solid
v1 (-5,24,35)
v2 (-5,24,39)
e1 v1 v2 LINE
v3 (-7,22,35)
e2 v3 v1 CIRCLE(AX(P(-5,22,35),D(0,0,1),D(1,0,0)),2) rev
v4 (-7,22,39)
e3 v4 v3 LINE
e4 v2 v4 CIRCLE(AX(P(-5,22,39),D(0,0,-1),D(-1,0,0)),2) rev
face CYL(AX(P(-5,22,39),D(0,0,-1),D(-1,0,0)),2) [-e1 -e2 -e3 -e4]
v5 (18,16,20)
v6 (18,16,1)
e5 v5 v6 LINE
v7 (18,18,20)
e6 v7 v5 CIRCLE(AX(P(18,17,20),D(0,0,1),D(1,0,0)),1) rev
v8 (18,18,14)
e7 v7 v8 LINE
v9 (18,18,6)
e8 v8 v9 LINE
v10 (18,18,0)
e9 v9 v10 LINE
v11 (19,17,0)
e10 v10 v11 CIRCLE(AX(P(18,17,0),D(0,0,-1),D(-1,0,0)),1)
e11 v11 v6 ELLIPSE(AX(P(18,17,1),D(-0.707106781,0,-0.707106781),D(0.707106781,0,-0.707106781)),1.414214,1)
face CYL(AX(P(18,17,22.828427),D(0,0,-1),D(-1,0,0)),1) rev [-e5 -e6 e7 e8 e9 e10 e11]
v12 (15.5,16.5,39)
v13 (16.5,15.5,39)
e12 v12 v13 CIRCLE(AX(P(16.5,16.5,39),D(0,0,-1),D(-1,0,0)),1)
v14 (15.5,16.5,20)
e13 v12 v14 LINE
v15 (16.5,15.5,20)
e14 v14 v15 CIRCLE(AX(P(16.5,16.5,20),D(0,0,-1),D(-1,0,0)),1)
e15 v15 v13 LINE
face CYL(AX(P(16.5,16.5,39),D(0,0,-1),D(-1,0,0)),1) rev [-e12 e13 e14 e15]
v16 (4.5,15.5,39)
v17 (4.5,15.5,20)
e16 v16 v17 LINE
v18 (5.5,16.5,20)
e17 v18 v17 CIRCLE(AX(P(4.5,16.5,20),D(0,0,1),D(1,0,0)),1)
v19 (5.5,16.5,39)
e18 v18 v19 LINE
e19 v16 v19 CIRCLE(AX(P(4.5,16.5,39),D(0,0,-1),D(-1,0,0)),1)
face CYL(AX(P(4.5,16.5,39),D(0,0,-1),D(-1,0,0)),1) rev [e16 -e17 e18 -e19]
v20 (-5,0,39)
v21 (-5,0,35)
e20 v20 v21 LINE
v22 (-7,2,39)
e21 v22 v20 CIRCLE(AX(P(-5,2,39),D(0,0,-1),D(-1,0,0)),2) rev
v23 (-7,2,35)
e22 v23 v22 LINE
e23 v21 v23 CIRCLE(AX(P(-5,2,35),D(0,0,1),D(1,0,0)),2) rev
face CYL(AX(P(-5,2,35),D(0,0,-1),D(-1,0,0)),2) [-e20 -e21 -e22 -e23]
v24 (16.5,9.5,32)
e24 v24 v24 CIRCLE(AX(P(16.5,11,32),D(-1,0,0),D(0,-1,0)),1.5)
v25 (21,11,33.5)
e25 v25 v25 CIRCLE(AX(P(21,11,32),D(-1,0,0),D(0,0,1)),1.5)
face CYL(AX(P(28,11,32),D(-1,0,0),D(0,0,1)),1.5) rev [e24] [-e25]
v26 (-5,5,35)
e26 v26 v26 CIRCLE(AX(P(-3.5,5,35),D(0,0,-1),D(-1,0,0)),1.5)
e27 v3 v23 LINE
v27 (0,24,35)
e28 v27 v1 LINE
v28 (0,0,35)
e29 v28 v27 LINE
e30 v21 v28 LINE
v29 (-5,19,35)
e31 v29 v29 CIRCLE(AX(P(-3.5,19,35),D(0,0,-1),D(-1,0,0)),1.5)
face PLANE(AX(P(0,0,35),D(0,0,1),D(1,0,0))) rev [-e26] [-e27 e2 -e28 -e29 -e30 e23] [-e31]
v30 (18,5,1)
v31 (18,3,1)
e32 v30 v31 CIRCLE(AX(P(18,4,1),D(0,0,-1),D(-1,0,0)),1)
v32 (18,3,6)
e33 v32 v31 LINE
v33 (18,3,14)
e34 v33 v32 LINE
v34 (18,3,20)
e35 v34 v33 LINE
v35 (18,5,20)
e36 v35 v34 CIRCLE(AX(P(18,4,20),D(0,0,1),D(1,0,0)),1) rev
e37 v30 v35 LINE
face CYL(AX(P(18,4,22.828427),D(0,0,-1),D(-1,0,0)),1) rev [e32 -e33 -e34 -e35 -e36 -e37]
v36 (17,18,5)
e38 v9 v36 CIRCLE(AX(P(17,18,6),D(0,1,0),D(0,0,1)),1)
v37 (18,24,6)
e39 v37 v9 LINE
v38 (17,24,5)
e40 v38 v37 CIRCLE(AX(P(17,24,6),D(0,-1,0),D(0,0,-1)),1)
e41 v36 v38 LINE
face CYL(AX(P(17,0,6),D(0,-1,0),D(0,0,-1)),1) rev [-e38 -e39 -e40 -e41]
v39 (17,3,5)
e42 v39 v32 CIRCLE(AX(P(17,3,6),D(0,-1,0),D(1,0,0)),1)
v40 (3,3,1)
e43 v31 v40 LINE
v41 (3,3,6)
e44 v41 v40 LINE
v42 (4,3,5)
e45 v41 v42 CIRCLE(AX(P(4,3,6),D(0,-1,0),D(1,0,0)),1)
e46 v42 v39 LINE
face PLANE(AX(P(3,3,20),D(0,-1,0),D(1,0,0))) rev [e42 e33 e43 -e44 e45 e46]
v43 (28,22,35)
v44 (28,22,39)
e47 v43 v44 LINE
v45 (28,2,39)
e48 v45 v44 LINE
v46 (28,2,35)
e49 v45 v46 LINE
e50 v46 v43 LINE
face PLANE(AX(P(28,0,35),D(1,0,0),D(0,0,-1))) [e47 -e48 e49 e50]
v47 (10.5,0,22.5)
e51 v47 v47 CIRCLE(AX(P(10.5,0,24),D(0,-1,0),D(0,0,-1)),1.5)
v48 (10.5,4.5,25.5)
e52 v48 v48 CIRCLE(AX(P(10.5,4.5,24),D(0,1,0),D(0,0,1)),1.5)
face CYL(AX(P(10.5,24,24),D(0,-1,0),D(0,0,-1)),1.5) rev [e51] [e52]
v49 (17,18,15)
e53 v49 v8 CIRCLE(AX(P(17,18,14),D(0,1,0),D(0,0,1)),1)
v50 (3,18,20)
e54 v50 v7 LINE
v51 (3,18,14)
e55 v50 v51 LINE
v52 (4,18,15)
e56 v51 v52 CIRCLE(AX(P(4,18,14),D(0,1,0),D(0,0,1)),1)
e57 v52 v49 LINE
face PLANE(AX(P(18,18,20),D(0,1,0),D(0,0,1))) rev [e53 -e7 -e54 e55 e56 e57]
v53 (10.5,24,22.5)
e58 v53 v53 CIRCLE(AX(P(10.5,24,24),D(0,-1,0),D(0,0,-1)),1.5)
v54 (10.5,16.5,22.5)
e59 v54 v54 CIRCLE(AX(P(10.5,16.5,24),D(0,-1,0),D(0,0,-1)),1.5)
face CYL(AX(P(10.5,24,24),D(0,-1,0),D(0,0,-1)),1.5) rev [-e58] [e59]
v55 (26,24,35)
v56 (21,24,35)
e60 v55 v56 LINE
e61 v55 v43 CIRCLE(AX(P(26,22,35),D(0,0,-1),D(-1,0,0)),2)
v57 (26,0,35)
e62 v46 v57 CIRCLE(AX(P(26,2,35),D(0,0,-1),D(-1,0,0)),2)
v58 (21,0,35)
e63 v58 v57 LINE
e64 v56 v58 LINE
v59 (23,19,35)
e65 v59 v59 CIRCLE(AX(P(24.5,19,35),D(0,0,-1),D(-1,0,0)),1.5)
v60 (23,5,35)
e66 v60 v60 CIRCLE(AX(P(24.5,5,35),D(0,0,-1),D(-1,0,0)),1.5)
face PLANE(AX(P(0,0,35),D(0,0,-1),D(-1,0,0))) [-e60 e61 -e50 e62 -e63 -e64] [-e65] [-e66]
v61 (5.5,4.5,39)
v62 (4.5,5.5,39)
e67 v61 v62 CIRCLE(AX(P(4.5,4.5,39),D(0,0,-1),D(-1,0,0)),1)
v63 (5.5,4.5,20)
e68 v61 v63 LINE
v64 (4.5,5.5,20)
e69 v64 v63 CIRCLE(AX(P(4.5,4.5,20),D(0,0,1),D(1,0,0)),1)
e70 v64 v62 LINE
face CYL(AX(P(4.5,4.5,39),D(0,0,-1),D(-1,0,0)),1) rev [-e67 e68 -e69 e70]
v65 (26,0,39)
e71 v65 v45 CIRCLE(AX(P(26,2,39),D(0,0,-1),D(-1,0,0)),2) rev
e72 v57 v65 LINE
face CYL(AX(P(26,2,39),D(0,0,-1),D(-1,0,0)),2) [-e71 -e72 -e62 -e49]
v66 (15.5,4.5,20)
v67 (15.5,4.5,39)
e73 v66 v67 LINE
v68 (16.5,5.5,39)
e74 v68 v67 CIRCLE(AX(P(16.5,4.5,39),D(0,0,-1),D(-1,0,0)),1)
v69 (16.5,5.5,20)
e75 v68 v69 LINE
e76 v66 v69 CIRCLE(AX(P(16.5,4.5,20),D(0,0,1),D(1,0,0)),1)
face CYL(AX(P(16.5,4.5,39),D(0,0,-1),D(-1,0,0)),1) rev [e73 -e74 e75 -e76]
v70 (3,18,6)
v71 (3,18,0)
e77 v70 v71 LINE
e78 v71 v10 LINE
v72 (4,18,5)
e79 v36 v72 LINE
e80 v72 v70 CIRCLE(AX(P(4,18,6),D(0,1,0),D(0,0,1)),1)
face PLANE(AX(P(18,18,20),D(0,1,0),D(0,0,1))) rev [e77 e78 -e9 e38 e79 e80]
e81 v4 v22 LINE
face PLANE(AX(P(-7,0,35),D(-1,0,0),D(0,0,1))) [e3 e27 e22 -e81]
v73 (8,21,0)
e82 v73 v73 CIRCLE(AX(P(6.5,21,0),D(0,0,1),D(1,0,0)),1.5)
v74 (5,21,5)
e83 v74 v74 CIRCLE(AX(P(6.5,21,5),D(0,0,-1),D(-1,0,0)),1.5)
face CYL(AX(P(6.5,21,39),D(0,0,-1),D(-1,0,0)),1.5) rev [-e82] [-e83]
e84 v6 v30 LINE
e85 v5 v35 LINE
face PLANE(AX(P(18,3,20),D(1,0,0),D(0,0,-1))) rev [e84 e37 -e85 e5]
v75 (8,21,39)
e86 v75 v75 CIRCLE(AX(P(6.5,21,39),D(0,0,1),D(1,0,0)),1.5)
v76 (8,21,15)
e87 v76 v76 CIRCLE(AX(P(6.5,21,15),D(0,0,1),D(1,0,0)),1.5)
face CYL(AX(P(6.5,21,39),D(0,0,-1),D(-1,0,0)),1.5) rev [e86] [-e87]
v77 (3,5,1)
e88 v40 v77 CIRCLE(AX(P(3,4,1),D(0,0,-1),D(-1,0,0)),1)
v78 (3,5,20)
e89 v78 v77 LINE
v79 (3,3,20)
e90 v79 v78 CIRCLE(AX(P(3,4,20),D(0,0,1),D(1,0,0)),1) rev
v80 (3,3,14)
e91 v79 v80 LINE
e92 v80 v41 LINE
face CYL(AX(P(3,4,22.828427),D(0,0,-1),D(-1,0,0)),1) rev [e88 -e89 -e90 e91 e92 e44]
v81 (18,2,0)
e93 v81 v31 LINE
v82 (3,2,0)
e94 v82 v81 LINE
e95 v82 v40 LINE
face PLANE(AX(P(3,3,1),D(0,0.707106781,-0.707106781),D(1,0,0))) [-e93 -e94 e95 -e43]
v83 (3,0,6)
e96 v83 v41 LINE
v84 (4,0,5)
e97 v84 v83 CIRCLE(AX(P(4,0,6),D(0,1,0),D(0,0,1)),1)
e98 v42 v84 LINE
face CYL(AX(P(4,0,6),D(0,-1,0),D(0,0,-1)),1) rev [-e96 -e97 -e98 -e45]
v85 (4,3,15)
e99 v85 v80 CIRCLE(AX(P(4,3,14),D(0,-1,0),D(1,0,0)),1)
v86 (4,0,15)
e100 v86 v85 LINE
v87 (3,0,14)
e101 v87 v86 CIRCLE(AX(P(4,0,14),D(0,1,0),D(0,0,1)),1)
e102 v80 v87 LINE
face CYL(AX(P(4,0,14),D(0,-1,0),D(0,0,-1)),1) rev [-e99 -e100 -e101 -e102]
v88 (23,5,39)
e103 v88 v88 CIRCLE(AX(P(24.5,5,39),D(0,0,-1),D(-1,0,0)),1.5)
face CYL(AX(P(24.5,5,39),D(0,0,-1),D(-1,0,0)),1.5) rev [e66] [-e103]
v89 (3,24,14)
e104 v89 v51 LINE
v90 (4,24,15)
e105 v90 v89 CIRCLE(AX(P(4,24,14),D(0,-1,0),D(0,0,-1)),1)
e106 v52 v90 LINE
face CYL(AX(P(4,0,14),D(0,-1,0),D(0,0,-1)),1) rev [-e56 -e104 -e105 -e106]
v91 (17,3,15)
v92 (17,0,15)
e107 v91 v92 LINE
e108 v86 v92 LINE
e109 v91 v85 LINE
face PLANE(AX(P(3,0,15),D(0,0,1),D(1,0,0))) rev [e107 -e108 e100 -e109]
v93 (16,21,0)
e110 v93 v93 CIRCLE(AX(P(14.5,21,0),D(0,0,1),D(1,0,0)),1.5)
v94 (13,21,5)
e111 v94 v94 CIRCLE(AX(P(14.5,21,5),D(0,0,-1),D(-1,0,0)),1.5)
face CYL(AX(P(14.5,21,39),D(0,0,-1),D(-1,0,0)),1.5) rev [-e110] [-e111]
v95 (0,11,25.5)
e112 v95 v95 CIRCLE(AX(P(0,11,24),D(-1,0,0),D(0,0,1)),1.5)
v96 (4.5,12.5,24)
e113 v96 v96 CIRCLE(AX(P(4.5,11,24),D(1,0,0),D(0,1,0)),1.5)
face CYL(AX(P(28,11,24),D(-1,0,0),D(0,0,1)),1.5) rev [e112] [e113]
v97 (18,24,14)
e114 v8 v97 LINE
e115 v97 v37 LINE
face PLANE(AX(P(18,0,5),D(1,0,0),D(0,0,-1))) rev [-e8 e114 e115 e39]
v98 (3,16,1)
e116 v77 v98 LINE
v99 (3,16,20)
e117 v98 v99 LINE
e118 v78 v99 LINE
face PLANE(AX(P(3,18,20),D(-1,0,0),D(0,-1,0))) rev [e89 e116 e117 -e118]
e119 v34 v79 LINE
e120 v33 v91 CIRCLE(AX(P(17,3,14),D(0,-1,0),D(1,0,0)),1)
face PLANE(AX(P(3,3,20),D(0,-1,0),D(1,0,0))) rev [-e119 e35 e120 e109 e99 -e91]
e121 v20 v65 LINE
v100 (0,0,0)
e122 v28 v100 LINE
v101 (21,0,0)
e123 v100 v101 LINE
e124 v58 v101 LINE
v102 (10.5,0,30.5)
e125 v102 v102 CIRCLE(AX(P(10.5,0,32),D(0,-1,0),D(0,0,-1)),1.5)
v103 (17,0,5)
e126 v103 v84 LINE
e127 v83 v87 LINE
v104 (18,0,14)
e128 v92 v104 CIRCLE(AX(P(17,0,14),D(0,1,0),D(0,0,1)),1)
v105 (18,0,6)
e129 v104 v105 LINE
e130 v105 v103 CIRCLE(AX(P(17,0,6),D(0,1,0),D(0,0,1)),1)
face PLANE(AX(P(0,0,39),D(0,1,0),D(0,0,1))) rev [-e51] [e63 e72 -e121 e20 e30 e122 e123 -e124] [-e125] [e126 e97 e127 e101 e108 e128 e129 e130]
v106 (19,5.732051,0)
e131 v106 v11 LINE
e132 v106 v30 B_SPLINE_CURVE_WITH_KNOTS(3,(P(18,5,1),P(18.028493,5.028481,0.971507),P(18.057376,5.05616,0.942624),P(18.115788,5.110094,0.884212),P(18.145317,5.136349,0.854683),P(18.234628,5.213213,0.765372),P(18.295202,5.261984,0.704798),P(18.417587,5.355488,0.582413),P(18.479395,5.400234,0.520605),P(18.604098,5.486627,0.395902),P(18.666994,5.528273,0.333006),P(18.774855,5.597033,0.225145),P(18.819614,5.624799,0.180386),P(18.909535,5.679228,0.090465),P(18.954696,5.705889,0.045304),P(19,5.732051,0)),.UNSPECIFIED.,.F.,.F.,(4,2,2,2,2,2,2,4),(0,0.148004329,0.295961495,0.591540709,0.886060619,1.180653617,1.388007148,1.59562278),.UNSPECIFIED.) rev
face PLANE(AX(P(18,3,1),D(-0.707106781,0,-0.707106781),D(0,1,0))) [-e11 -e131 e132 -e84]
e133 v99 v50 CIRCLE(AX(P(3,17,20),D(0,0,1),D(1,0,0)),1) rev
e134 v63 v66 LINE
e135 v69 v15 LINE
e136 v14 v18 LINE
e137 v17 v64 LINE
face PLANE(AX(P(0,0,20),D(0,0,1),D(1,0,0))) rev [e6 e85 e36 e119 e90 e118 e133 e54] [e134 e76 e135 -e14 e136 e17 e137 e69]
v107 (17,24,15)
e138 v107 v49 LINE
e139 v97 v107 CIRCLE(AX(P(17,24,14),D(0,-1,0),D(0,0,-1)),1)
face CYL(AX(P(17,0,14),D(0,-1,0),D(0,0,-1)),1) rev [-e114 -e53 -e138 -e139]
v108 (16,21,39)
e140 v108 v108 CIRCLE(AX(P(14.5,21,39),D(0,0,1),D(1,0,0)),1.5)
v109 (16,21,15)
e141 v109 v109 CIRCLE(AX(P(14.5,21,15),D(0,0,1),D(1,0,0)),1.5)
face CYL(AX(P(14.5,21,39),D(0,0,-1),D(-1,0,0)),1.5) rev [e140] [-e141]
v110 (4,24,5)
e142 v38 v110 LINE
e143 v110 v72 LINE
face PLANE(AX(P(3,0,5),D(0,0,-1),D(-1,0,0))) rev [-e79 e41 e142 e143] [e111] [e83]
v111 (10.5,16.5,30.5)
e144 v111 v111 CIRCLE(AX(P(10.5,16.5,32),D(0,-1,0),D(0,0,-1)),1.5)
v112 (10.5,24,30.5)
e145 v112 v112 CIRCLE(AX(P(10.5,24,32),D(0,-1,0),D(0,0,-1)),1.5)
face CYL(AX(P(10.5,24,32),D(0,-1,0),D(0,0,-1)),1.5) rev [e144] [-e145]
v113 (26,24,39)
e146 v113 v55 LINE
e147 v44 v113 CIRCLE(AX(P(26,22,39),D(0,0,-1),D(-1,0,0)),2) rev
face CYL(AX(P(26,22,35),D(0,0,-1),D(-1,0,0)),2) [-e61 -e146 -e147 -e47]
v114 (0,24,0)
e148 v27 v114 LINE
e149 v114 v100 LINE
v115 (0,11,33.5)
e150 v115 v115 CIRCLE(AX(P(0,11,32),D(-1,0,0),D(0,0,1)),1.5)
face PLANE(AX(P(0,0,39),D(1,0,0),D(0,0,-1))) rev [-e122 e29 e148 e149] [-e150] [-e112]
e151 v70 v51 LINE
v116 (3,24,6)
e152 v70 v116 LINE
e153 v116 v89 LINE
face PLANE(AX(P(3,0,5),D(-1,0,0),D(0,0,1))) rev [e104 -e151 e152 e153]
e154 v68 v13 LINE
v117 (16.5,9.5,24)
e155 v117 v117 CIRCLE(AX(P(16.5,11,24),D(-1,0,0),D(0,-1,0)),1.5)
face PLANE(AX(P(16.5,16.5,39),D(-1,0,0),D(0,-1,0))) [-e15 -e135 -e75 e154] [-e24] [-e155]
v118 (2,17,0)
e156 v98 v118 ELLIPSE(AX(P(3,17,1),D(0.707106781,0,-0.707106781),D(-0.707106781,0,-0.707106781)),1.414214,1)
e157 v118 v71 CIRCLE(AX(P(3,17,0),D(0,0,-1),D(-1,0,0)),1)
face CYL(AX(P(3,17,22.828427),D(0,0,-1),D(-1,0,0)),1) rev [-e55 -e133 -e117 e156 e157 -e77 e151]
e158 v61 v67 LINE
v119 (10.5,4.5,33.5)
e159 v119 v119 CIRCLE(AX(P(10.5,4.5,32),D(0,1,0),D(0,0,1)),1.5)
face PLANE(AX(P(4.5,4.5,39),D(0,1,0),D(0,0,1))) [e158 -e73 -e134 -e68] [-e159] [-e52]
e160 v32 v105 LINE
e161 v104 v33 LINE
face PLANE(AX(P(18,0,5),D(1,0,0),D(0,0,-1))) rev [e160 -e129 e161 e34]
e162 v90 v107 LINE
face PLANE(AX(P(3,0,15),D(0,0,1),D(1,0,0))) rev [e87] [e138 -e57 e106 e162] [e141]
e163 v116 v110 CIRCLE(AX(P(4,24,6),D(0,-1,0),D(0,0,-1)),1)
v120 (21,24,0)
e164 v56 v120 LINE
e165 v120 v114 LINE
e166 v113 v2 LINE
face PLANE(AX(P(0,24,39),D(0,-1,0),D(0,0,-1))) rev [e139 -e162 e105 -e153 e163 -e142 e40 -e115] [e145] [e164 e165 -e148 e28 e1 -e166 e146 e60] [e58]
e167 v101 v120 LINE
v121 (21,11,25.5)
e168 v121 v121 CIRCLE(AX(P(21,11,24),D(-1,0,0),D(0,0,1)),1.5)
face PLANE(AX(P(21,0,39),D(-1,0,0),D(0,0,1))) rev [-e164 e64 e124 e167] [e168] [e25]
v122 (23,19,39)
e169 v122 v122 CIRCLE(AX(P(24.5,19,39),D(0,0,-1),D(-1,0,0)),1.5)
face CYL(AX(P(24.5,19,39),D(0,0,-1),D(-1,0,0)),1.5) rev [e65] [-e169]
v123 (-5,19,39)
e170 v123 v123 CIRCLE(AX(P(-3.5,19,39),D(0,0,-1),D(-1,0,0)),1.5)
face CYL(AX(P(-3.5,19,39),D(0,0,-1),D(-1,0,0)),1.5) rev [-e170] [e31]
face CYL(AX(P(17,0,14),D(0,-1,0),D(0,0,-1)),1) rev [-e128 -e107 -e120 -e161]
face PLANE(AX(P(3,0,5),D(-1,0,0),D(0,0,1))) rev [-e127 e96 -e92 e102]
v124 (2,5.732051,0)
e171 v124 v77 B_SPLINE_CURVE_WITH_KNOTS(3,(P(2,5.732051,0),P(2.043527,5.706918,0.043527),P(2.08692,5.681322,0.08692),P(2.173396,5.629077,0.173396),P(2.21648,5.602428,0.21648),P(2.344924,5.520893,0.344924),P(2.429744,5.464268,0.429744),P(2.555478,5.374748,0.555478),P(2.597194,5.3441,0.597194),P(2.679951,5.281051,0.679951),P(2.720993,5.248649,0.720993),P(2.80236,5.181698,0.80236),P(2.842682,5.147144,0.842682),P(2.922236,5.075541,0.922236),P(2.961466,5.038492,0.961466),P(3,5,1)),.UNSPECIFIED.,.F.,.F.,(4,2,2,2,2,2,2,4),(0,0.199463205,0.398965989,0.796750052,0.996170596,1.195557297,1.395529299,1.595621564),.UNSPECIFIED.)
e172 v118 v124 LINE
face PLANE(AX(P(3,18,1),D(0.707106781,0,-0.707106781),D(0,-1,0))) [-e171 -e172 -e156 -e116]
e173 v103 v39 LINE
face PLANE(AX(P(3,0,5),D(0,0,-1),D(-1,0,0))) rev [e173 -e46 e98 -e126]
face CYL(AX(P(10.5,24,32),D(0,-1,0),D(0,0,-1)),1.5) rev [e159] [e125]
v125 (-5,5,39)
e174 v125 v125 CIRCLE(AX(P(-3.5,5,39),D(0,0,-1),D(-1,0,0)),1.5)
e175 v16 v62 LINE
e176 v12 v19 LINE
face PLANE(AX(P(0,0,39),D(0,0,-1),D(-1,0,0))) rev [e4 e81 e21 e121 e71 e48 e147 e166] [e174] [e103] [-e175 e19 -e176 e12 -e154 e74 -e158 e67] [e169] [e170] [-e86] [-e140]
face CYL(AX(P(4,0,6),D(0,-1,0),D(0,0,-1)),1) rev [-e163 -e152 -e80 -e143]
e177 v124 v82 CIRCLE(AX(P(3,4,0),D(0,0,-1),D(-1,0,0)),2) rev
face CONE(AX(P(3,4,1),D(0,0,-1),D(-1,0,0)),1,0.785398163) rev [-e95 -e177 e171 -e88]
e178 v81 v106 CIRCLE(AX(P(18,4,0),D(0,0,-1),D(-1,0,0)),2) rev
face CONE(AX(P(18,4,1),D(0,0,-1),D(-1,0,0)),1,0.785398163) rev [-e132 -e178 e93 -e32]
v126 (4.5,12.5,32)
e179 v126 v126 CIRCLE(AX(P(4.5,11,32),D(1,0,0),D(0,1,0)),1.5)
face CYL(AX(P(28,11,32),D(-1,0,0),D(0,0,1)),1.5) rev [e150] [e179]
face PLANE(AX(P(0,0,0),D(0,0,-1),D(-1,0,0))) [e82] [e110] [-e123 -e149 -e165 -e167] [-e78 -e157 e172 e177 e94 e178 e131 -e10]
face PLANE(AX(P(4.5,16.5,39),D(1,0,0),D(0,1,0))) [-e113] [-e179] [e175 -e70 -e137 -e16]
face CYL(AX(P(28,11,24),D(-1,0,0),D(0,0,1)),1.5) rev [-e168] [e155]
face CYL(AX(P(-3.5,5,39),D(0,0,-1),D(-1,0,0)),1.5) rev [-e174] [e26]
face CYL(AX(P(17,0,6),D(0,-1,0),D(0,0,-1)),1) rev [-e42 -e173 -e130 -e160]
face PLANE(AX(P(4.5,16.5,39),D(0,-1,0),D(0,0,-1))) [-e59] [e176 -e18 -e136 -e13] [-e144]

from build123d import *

# Parameters (mm, degrees)
SKETCH_1_W           = 21
SKETCH_1_H           = 24
SKETCH_1_R           = 1.5
SKETCH_1_W_2         = 12
SKETCH_1_H_2         = 12
EXTRUDE_1_DEPTH      = 39
SKETCH_6_W           = 15
SKETCH_6_H           = 15
CUT_EXTRUDE_3_DEPTH  = 20
SKETCH_8_R           = 1.5
CUT_EXTRUDE_4_DEPTH  = 51.378566871
SKETCH_9_R           = 1
CUT_EXTRUDE_5_DEPTH  = 20
SKETCH_13_R          = 1
CUT_EXTRUDE_8_DEPTH  = 38.643060449
SKETCH_14_W          = 7
SKETCH_14_H          = 24
EXTRUDE_2_DEPTH      = 4
SKETCH_15_R          = 1.5
CUT_EXTRUDE_9_DEPTH  = 51.842895276
SKETCH_16_W          = 15
SKETCH_16_H          = 10
CUT_EXTRUDE_10_DEPTH = 54.674947601
SKETCH_17_R          = 1.5
CUT_EXTRUDE_11_DEPTH = 54.674947601
FILLET_1_R           = 1
FILLET_2_R           = 2
CHAMFER_1_SIZE       = 1


with BuildPart() as part:
    # 草图1 → 凸台-拉伸1 (new body)
    with BuildSketch(Plane.XY):
        with Locations((10.5, 12)):
            Rectangle(SKETCH_1_W, SKETCH_1_H)
        with Locations((6.5, 21)):
            Circle(SKETCH_1_R, mode=Mode.SUBTRACT)
        with Locations((14.5, 21)):
            Circle(SKETCH_1_R, mode=Mode.SUBTRACT)
        with Locations((10.5, 10.5)):
            Rectangle(SKETCH_1_W_2, SKETCH_1_H_2, mode=Mode.SUBTRACT)
    extrude(amount=EXTRUDE_1_DEPTH)

    # 草图6 → 切除-拉伸3 (cut)
    with BuildSketch(Plane(origin=(0, 0, 0), x_dir=(-1, 0, 0), z_dir=(0, 0, -1))):
        with Locations((-10.5, 10.5)):
            Rectangle(SKETCH_6_W, SKETCH_6_H)
    extrude(amount=-CUT_EXTRUDE_3_DEPTH, mode=Mode.SUBTRACT)

    # 草图8 → 切除-拉伸4 (cut, through all)
    with BuildSketch(Plane.XZ):
        with Locations(Location((10.5, 32, 0), (0, 0, 270))):
            Circle(SKETCH_8_R)
        with Locations(Location((10.5, 24, 0), (0, 0, 270))):
            Circle(SKETCH_8_R)
    extrude(amount=-CUT_EXTRUDE_4_DEPTH, mode=Mode.SUBTRACT)

    # 草图9 → 切除-拉伸5 (cut)
    with BuildSketch(Plane(origin=(0, 0, 0), x_dir=(-1, 0, 0), z_dir=(0, 0, -1))):
        with Locations((-18, 4)):
            Circle(SKETCH_9_R)
        with Locations((-18, 17)):
            Circle(SKETCH_9_R)
        with Locations((-3, 4)):
            Circle(SKETCH_9_R)
        with Locations((-3, 17)):
            Circle(SKETCH_9_R)
    extrude(amount=-CUT_EXTRUDE_5_DEPTH, mode=Mode.SUBTRACT)

    # 草图13 → 切除-拉伸8 (cut, through all)
    with BuildSketch(Plane(origin=(0, 0, 20), x_dir=(-1, 0, 0), z_dir=(0, 0, -1))):
        with Locations((-16.5, 16.5)):
            Circle(SKETCH_13_R)
        with Locations((-16.5, 4.5)):
            Circle(SKETCH_13_R)
        with Locations((-4.5, 4.5)):
            Circle(SKETCH_13_R)
        with Locations((-4.5, 16.5)):
            Circle(SKETCH_13_R)
    extrude(amount=-CUT_EXTRUDE_8_DEPTH, mode=Mode.SUBTRACT)

    # 草图14 → 凸台-拉伸2 (add)
    with BuildSketch(Plane.XY.offset(39)):
        with Locations((-3.5, 12)):
            Rectangle(SKETCH_14_W, SKETCH_14_H)
        with Locations((24.5, 12)):
            Rectangle(SKETCH_14_W, SKETCH_14_H)
    extrude(amount=-EXTRUDE_2_DEPTH)

    # 草图15 → 切除-拉伸9 (cut, through all)
    with BuildSketch(Plane(origin=(0, 0, 35), x_dir=(-1, 0, 0), z_dir=(0, 0, -1))):
        with Locations((3.5, 5)):
            Circle(SKETCH_15_R)
        with Locations((3.5, 19)):
            Circle(SKETCH_15_R)
        with Locations((-24.5, 5)):
            Circle(SKETCH_15_R)
        with Locations((-24.5, 19)):
            Circle(SKETCH_15_R)
    extrude(amount=-CUT_EXTRUDE_9_DEPTH, mode=Mode.SUBTRACT)

    # 草图16 → 切除-拉伸10 (cut, through all)
    with BuildSketch(Plane(origin=(0, 24, 0), x_dir=(1, 0, 0), z_dir=(0, 1, 0))):
        with Locations((10.5, -10)):
            Rectangle(SKETCH_16_W, SKETCH_16_H)
    extrude(amount=-CUT_EXTRUDE_10_DEPTH, mode=Mode.SUBTRACT)

    # 草图17 → 切除-拉伸11 (cut, through all)
    with BuildSketch(Plane.ZY):
        with Locations((32, 11)):
            Circle(SKETCH_17_R)
        with Locations((24, 11)):
            Circle(SKETCH_17_R)
    extrude(amount=-CUT_EXTRUDE_11_DEPTH, mode=Mode.SUBTRACT)

    # 圆角1
    fillet_1_edges = [part.edges().sort_by_distance(p)[0] for p in [
        (3, 21, 15),
        (3, 1.5, 15),
        (3, 1.5, 5),
        (3, 21, 5),
        (18, 21, 5),
        (18, 1.5, 5),
        (18, 1.5, 15),
        (18, 21, 15),
    ]]
    fillet(fillet_1_edges, radius=FILLET_1_R)

    # 圆角2
    fillet_2_edges = [part.edges().sort_by_distance(p)[0] for p in [
        (-7, 0, 37),
        (-7, 24, 37),
        (28, 24, 37),
        (28, 0, 37),
    ]]
    fillet(fillet_2_edges, radius=FILLET_2_R)

    # 倒角1
    chamfer_1_edges = [part.edges().sort_by_distance(p)[0] for p in [
        (10.5, 3, 0),
        (3, 10.5, 0),
        (18, 10.5, 0),
        (2, 4, 0),
        (19, 4, 0),
    ]]
    chamfer(chamfer_1_edges, length=CHAMFER_1_SIZE - 0.0001)  # a hair under: the kernel refuses the full size


solid = part.part
